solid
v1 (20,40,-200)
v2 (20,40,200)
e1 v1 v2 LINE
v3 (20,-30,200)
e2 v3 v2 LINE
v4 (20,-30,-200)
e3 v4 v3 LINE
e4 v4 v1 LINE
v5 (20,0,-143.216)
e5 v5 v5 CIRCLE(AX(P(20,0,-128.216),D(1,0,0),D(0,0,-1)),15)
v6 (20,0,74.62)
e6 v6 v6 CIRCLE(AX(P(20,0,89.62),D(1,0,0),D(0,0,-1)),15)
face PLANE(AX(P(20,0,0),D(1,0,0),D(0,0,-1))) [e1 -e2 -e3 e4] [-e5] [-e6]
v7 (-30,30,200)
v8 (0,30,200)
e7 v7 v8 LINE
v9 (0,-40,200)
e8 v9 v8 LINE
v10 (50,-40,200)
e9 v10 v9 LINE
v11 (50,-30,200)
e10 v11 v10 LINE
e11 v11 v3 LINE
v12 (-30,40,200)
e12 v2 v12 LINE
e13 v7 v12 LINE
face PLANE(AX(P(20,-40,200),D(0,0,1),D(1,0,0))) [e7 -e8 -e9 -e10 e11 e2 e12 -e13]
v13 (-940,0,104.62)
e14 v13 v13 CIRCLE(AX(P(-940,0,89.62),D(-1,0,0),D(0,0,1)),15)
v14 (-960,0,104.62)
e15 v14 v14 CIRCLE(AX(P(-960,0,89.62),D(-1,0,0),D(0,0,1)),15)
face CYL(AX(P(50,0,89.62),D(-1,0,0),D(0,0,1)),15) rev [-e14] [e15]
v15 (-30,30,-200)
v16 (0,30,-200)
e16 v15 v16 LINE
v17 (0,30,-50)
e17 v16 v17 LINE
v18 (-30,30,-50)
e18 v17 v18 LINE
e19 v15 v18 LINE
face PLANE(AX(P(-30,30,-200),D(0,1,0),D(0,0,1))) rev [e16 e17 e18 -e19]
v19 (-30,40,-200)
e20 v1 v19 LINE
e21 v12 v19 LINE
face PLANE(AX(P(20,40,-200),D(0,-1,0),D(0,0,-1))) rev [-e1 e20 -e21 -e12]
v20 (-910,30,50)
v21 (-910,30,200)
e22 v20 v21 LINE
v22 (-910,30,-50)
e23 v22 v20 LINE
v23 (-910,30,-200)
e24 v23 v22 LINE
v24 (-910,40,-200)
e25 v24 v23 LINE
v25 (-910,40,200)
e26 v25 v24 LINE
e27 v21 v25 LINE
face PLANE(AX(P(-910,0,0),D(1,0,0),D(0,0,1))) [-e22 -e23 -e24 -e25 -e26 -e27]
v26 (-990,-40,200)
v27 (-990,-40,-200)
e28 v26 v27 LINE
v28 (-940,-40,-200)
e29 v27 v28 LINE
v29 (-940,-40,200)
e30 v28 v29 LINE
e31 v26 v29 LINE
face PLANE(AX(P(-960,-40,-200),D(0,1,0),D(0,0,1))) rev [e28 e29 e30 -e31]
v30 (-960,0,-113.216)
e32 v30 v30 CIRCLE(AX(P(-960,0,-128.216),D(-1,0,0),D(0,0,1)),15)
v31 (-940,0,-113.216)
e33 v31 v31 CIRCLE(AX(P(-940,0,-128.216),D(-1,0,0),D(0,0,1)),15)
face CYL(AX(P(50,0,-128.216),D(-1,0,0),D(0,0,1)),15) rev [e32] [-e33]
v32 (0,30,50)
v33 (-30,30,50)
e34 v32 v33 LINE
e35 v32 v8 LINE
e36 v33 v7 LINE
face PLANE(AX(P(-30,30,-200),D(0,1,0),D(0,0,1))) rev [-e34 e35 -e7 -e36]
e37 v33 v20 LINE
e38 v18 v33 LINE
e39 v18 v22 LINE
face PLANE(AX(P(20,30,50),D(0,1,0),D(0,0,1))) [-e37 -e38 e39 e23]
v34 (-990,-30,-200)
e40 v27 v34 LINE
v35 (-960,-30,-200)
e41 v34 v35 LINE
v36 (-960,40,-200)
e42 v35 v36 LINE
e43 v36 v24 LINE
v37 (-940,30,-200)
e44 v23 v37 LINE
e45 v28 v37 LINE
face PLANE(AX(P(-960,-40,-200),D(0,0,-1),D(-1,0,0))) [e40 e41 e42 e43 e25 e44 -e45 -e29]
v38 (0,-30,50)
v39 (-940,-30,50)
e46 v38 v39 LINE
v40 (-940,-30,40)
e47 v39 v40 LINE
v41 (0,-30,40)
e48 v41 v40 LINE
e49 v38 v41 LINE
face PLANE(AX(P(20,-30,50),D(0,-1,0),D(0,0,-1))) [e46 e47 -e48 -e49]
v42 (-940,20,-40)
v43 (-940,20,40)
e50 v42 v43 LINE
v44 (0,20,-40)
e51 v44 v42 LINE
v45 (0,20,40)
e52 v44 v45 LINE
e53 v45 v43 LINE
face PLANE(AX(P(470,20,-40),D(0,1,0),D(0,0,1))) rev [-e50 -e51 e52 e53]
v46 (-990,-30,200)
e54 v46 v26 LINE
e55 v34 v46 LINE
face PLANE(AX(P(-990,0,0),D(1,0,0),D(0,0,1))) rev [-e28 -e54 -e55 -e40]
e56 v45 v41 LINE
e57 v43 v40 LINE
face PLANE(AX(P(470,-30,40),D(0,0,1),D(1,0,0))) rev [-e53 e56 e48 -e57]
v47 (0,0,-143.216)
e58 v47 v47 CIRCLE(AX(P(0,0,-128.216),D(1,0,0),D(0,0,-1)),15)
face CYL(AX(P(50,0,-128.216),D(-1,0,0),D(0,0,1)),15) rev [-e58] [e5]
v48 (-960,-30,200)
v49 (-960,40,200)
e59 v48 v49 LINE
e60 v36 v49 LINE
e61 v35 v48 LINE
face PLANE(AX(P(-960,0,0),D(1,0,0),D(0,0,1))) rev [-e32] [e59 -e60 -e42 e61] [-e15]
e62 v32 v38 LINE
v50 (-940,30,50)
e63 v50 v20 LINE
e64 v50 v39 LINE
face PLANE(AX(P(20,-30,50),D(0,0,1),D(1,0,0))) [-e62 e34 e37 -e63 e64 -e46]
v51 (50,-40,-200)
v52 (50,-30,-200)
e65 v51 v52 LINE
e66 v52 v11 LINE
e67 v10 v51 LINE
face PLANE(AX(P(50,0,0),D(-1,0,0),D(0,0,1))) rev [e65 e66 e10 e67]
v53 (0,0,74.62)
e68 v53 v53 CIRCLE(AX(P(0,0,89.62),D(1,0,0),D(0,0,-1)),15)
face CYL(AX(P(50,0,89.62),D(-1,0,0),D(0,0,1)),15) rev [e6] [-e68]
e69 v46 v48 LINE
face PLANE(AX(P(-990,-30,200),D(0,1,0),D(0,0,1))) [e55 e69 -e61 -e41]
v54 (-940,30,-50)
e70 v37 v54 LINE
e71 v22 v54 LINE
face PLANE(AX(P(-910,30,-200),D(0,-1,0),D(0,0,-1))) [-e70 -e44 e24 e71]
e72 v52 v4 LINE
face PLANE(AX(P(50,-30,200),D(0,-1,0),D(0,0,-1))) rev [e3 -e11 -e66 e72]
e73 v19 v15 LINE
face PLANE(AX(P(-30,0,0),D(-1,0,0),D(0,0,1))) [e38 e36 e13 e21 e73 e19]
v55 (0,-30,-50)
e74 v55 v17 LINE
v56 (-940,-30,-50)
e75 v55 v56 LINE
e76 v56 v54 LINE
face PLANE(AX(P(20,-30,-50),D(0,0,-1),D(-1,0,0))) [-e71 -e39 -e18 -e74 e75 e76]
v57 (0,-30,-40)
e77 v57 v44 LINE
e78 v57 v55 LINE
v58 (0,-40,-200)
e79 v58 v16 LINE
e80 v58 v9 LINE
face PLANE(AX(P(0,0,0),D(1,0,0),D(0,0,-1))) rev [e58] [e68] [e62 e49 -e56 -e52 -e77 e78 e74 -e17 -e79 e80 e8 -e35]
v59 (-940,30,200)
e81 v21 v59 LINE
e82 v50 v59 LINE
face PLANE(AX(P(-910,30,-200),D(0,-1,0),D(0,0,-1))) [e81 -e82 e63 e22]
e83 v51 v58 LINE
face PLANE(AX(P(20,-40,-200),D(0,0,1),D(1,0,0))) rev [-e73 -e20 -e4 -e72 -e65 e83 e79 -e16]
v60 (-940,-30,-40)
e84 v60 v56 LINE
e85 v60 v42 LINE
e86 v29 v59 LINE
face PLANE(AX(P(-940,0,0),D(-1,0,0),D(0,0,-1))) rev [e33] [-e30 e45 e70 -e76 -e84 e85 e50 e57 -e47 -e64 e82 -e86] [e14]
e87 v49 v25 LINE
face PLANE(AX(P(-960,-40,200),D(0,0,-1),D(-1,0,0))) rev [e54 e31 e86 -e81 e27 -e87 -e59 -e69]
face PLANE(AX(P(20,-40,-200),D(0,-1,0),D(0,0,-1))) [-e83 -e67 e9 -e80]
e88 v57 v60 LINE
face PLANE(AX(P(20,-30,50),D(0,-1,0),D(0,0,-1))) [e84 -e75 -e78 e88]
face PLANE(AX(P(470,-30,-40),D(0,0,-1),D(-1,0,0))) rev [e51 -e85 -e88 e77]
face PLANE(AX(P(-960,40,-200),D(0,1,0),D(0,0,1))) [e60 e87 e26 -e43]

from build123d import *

# Parameters (mm, degrees)
SKETCH1_W           = 400
SKETCH1_H           = 80
BOSS_EXTRUDE1_DEPTH = 20
SKETCH5_W           = 400
SKETCH5_H           = 10
BOSS_EXTRUDE2_DEPTH = 30
SKETCH7_W           = 400
SKETCH7_H           = 10
BOSS_EXTRUDE3_DEPTH = 30
BOSS_EXTRUDE4_START = -20
SKETCH8_W           = 100
SKETCH8_H           = 60
BOSS_EXTRUDE4_DEPTH = 490
SKETCH9_W           = 80
SKETCH9_H           = 50
CUT_EXTRUDE1_DEPTH  = 940
SKETCH11_W          = 80
SKETCH11_H          = 50
BOSS_EXTRUDE5_DEPTH = 20
MIRROR20_START      = -30
MIRROR20_OUTLINE_W  = 490
MIRROR20_OUTLINE_H  = 100
MIRROR20_DEPTH      = 60
SKETCH12_R          = 15
CUT_EXTRUDE2_DEPTH  = 1031.388276331
SKETCH19_R          = 15
CUT_EXTRUDE10_DEPTH = 1031.388276331


# Read off the part's stored shape, not the designer's step: Mirror20
with BuildPart() as part:
    # Sketch1 → Boss-Extrude1 (new body)
    with BuildSketch(Plane(origin=(0, 0, 0), x_dir=(0, 0, -1), z_dir=(1, 0, 0))):
        Rectangle(SKETCH1_W, SKETCH1_H)
    boss_extrude1 = extrude(amount=BOSS_EXTRUDE1_DEPTH)

    # Sketch5 → Boss-Extrude2 (add)
    with BuildSketch(Plane.ZY):
        with Locations((0, 35)):
            Rectangle(SKETCH5_W, SKETCH5_H)
    boss_extrude2 = extrude(amount=BOSS_EXTRUDE2_DEPTH)

    # Sketch7 → Boss-Extrude3 (add)
    with BuildSketch(Plane(origin=(20, 0, 0), x_dir=(0, 0, -1), z_dir=(1, 0, 0))):
        with Locations((0, -35)):
            Rectangle(SKETCH7_W, SKETCH7_H)
    boss_extrude3 = extrude(amount=BOSS_EXTRUDE3_DEPTH)

    # Sketch8 → Boss-Extrude4 (add)
    with BuildSketch(Plane.ZY.offset(BOSS_EXTRUDE4_START)):
        Rectangle(SKETCH8_W, SKETCH8_H)
    extrude(amount=BOSS_EXTRUDE4_DEPTH)

    # Sketch9 → Cut-Extrude1 (cut)
    with BuildSketch(Plane.ZY.offset(470)):
        with Locations((0, -5)):
            Rectangle(SKETCH9_W, SKETCH9_H)
    cut_extrude1 = extrude(amount=-CUT_EXTRUDE1_DEPTH, mode=Mode.SUBTRACT)

    # Sketch11 → Boss-Extrude5 (add)
    with BuildSketch(Plane(origin=(20, 0, 0), x_dir=(0, 0, -1), z_dir=(1, 0, 0))):
        with Locations((0, -5)):
            Rectangle(SKETCH11_W, SKETCH11_H)
    boss_extrude5 = extrude(amount=-BOSS_EXTRUDE5_DEPTH)

    # Mirror20 outline → Mirror20 (add)
    with BuildSketch(Plane(origin=(0, 0, 0), x_dir=(1, 0, 0), z_dir=(0, 1, 0)).offset(MIRROR20_START)):
        with Locations((-715, 0)):
            Rectangle(MIRROR20_OUTLINE_W, MIRROR20_OUTLINE_H)
    extrude(amount=MIRROR20_DEPTH)

    # Mirror22: Boss-Extrude1, Boss-Extrude2, Boss-Extrude3, Cut-Extrude1, Boss-Extrude5 across plane
    add(boss_extrude1.mirror(Plane.ZY.offset(470)))
    add(boss_extrude2.mirror(Plane.ZY.offset(470)))
    add(boss_extrude3.mirror(Plane.ZY.offset(470)))
    add(cut_extrude1.mirror(Plane.ZY.offset(470)), mode=Mode.SUBTRACT)
    add(boss_extrude5.mirror(Plane.ZY.offset(470)))

    # Sketch12 → Cut-Extrude2 (cut, through all)
    with BuildSketch(Plane.ZY.offset(960)):
        with Locations((89.62, 0)):
            Circle(SKETCH12_R)
    extrude(amount=-CUT_EXTRUDE2_DEPTH, mode=Mode.SUBTRACT)

    # Sketch19 → Cut-Extrude10 (cut, through all)
    with BuildSketch(Plane.ZY.offset(960)):
        with Locations((-128.216, 0)):
            Circle(SKETCH19_R)
    extrude(amount=-CUT_EXTRUDE10_DEPTH, mode=Mode.SUBTRACT)


solid = part.part
